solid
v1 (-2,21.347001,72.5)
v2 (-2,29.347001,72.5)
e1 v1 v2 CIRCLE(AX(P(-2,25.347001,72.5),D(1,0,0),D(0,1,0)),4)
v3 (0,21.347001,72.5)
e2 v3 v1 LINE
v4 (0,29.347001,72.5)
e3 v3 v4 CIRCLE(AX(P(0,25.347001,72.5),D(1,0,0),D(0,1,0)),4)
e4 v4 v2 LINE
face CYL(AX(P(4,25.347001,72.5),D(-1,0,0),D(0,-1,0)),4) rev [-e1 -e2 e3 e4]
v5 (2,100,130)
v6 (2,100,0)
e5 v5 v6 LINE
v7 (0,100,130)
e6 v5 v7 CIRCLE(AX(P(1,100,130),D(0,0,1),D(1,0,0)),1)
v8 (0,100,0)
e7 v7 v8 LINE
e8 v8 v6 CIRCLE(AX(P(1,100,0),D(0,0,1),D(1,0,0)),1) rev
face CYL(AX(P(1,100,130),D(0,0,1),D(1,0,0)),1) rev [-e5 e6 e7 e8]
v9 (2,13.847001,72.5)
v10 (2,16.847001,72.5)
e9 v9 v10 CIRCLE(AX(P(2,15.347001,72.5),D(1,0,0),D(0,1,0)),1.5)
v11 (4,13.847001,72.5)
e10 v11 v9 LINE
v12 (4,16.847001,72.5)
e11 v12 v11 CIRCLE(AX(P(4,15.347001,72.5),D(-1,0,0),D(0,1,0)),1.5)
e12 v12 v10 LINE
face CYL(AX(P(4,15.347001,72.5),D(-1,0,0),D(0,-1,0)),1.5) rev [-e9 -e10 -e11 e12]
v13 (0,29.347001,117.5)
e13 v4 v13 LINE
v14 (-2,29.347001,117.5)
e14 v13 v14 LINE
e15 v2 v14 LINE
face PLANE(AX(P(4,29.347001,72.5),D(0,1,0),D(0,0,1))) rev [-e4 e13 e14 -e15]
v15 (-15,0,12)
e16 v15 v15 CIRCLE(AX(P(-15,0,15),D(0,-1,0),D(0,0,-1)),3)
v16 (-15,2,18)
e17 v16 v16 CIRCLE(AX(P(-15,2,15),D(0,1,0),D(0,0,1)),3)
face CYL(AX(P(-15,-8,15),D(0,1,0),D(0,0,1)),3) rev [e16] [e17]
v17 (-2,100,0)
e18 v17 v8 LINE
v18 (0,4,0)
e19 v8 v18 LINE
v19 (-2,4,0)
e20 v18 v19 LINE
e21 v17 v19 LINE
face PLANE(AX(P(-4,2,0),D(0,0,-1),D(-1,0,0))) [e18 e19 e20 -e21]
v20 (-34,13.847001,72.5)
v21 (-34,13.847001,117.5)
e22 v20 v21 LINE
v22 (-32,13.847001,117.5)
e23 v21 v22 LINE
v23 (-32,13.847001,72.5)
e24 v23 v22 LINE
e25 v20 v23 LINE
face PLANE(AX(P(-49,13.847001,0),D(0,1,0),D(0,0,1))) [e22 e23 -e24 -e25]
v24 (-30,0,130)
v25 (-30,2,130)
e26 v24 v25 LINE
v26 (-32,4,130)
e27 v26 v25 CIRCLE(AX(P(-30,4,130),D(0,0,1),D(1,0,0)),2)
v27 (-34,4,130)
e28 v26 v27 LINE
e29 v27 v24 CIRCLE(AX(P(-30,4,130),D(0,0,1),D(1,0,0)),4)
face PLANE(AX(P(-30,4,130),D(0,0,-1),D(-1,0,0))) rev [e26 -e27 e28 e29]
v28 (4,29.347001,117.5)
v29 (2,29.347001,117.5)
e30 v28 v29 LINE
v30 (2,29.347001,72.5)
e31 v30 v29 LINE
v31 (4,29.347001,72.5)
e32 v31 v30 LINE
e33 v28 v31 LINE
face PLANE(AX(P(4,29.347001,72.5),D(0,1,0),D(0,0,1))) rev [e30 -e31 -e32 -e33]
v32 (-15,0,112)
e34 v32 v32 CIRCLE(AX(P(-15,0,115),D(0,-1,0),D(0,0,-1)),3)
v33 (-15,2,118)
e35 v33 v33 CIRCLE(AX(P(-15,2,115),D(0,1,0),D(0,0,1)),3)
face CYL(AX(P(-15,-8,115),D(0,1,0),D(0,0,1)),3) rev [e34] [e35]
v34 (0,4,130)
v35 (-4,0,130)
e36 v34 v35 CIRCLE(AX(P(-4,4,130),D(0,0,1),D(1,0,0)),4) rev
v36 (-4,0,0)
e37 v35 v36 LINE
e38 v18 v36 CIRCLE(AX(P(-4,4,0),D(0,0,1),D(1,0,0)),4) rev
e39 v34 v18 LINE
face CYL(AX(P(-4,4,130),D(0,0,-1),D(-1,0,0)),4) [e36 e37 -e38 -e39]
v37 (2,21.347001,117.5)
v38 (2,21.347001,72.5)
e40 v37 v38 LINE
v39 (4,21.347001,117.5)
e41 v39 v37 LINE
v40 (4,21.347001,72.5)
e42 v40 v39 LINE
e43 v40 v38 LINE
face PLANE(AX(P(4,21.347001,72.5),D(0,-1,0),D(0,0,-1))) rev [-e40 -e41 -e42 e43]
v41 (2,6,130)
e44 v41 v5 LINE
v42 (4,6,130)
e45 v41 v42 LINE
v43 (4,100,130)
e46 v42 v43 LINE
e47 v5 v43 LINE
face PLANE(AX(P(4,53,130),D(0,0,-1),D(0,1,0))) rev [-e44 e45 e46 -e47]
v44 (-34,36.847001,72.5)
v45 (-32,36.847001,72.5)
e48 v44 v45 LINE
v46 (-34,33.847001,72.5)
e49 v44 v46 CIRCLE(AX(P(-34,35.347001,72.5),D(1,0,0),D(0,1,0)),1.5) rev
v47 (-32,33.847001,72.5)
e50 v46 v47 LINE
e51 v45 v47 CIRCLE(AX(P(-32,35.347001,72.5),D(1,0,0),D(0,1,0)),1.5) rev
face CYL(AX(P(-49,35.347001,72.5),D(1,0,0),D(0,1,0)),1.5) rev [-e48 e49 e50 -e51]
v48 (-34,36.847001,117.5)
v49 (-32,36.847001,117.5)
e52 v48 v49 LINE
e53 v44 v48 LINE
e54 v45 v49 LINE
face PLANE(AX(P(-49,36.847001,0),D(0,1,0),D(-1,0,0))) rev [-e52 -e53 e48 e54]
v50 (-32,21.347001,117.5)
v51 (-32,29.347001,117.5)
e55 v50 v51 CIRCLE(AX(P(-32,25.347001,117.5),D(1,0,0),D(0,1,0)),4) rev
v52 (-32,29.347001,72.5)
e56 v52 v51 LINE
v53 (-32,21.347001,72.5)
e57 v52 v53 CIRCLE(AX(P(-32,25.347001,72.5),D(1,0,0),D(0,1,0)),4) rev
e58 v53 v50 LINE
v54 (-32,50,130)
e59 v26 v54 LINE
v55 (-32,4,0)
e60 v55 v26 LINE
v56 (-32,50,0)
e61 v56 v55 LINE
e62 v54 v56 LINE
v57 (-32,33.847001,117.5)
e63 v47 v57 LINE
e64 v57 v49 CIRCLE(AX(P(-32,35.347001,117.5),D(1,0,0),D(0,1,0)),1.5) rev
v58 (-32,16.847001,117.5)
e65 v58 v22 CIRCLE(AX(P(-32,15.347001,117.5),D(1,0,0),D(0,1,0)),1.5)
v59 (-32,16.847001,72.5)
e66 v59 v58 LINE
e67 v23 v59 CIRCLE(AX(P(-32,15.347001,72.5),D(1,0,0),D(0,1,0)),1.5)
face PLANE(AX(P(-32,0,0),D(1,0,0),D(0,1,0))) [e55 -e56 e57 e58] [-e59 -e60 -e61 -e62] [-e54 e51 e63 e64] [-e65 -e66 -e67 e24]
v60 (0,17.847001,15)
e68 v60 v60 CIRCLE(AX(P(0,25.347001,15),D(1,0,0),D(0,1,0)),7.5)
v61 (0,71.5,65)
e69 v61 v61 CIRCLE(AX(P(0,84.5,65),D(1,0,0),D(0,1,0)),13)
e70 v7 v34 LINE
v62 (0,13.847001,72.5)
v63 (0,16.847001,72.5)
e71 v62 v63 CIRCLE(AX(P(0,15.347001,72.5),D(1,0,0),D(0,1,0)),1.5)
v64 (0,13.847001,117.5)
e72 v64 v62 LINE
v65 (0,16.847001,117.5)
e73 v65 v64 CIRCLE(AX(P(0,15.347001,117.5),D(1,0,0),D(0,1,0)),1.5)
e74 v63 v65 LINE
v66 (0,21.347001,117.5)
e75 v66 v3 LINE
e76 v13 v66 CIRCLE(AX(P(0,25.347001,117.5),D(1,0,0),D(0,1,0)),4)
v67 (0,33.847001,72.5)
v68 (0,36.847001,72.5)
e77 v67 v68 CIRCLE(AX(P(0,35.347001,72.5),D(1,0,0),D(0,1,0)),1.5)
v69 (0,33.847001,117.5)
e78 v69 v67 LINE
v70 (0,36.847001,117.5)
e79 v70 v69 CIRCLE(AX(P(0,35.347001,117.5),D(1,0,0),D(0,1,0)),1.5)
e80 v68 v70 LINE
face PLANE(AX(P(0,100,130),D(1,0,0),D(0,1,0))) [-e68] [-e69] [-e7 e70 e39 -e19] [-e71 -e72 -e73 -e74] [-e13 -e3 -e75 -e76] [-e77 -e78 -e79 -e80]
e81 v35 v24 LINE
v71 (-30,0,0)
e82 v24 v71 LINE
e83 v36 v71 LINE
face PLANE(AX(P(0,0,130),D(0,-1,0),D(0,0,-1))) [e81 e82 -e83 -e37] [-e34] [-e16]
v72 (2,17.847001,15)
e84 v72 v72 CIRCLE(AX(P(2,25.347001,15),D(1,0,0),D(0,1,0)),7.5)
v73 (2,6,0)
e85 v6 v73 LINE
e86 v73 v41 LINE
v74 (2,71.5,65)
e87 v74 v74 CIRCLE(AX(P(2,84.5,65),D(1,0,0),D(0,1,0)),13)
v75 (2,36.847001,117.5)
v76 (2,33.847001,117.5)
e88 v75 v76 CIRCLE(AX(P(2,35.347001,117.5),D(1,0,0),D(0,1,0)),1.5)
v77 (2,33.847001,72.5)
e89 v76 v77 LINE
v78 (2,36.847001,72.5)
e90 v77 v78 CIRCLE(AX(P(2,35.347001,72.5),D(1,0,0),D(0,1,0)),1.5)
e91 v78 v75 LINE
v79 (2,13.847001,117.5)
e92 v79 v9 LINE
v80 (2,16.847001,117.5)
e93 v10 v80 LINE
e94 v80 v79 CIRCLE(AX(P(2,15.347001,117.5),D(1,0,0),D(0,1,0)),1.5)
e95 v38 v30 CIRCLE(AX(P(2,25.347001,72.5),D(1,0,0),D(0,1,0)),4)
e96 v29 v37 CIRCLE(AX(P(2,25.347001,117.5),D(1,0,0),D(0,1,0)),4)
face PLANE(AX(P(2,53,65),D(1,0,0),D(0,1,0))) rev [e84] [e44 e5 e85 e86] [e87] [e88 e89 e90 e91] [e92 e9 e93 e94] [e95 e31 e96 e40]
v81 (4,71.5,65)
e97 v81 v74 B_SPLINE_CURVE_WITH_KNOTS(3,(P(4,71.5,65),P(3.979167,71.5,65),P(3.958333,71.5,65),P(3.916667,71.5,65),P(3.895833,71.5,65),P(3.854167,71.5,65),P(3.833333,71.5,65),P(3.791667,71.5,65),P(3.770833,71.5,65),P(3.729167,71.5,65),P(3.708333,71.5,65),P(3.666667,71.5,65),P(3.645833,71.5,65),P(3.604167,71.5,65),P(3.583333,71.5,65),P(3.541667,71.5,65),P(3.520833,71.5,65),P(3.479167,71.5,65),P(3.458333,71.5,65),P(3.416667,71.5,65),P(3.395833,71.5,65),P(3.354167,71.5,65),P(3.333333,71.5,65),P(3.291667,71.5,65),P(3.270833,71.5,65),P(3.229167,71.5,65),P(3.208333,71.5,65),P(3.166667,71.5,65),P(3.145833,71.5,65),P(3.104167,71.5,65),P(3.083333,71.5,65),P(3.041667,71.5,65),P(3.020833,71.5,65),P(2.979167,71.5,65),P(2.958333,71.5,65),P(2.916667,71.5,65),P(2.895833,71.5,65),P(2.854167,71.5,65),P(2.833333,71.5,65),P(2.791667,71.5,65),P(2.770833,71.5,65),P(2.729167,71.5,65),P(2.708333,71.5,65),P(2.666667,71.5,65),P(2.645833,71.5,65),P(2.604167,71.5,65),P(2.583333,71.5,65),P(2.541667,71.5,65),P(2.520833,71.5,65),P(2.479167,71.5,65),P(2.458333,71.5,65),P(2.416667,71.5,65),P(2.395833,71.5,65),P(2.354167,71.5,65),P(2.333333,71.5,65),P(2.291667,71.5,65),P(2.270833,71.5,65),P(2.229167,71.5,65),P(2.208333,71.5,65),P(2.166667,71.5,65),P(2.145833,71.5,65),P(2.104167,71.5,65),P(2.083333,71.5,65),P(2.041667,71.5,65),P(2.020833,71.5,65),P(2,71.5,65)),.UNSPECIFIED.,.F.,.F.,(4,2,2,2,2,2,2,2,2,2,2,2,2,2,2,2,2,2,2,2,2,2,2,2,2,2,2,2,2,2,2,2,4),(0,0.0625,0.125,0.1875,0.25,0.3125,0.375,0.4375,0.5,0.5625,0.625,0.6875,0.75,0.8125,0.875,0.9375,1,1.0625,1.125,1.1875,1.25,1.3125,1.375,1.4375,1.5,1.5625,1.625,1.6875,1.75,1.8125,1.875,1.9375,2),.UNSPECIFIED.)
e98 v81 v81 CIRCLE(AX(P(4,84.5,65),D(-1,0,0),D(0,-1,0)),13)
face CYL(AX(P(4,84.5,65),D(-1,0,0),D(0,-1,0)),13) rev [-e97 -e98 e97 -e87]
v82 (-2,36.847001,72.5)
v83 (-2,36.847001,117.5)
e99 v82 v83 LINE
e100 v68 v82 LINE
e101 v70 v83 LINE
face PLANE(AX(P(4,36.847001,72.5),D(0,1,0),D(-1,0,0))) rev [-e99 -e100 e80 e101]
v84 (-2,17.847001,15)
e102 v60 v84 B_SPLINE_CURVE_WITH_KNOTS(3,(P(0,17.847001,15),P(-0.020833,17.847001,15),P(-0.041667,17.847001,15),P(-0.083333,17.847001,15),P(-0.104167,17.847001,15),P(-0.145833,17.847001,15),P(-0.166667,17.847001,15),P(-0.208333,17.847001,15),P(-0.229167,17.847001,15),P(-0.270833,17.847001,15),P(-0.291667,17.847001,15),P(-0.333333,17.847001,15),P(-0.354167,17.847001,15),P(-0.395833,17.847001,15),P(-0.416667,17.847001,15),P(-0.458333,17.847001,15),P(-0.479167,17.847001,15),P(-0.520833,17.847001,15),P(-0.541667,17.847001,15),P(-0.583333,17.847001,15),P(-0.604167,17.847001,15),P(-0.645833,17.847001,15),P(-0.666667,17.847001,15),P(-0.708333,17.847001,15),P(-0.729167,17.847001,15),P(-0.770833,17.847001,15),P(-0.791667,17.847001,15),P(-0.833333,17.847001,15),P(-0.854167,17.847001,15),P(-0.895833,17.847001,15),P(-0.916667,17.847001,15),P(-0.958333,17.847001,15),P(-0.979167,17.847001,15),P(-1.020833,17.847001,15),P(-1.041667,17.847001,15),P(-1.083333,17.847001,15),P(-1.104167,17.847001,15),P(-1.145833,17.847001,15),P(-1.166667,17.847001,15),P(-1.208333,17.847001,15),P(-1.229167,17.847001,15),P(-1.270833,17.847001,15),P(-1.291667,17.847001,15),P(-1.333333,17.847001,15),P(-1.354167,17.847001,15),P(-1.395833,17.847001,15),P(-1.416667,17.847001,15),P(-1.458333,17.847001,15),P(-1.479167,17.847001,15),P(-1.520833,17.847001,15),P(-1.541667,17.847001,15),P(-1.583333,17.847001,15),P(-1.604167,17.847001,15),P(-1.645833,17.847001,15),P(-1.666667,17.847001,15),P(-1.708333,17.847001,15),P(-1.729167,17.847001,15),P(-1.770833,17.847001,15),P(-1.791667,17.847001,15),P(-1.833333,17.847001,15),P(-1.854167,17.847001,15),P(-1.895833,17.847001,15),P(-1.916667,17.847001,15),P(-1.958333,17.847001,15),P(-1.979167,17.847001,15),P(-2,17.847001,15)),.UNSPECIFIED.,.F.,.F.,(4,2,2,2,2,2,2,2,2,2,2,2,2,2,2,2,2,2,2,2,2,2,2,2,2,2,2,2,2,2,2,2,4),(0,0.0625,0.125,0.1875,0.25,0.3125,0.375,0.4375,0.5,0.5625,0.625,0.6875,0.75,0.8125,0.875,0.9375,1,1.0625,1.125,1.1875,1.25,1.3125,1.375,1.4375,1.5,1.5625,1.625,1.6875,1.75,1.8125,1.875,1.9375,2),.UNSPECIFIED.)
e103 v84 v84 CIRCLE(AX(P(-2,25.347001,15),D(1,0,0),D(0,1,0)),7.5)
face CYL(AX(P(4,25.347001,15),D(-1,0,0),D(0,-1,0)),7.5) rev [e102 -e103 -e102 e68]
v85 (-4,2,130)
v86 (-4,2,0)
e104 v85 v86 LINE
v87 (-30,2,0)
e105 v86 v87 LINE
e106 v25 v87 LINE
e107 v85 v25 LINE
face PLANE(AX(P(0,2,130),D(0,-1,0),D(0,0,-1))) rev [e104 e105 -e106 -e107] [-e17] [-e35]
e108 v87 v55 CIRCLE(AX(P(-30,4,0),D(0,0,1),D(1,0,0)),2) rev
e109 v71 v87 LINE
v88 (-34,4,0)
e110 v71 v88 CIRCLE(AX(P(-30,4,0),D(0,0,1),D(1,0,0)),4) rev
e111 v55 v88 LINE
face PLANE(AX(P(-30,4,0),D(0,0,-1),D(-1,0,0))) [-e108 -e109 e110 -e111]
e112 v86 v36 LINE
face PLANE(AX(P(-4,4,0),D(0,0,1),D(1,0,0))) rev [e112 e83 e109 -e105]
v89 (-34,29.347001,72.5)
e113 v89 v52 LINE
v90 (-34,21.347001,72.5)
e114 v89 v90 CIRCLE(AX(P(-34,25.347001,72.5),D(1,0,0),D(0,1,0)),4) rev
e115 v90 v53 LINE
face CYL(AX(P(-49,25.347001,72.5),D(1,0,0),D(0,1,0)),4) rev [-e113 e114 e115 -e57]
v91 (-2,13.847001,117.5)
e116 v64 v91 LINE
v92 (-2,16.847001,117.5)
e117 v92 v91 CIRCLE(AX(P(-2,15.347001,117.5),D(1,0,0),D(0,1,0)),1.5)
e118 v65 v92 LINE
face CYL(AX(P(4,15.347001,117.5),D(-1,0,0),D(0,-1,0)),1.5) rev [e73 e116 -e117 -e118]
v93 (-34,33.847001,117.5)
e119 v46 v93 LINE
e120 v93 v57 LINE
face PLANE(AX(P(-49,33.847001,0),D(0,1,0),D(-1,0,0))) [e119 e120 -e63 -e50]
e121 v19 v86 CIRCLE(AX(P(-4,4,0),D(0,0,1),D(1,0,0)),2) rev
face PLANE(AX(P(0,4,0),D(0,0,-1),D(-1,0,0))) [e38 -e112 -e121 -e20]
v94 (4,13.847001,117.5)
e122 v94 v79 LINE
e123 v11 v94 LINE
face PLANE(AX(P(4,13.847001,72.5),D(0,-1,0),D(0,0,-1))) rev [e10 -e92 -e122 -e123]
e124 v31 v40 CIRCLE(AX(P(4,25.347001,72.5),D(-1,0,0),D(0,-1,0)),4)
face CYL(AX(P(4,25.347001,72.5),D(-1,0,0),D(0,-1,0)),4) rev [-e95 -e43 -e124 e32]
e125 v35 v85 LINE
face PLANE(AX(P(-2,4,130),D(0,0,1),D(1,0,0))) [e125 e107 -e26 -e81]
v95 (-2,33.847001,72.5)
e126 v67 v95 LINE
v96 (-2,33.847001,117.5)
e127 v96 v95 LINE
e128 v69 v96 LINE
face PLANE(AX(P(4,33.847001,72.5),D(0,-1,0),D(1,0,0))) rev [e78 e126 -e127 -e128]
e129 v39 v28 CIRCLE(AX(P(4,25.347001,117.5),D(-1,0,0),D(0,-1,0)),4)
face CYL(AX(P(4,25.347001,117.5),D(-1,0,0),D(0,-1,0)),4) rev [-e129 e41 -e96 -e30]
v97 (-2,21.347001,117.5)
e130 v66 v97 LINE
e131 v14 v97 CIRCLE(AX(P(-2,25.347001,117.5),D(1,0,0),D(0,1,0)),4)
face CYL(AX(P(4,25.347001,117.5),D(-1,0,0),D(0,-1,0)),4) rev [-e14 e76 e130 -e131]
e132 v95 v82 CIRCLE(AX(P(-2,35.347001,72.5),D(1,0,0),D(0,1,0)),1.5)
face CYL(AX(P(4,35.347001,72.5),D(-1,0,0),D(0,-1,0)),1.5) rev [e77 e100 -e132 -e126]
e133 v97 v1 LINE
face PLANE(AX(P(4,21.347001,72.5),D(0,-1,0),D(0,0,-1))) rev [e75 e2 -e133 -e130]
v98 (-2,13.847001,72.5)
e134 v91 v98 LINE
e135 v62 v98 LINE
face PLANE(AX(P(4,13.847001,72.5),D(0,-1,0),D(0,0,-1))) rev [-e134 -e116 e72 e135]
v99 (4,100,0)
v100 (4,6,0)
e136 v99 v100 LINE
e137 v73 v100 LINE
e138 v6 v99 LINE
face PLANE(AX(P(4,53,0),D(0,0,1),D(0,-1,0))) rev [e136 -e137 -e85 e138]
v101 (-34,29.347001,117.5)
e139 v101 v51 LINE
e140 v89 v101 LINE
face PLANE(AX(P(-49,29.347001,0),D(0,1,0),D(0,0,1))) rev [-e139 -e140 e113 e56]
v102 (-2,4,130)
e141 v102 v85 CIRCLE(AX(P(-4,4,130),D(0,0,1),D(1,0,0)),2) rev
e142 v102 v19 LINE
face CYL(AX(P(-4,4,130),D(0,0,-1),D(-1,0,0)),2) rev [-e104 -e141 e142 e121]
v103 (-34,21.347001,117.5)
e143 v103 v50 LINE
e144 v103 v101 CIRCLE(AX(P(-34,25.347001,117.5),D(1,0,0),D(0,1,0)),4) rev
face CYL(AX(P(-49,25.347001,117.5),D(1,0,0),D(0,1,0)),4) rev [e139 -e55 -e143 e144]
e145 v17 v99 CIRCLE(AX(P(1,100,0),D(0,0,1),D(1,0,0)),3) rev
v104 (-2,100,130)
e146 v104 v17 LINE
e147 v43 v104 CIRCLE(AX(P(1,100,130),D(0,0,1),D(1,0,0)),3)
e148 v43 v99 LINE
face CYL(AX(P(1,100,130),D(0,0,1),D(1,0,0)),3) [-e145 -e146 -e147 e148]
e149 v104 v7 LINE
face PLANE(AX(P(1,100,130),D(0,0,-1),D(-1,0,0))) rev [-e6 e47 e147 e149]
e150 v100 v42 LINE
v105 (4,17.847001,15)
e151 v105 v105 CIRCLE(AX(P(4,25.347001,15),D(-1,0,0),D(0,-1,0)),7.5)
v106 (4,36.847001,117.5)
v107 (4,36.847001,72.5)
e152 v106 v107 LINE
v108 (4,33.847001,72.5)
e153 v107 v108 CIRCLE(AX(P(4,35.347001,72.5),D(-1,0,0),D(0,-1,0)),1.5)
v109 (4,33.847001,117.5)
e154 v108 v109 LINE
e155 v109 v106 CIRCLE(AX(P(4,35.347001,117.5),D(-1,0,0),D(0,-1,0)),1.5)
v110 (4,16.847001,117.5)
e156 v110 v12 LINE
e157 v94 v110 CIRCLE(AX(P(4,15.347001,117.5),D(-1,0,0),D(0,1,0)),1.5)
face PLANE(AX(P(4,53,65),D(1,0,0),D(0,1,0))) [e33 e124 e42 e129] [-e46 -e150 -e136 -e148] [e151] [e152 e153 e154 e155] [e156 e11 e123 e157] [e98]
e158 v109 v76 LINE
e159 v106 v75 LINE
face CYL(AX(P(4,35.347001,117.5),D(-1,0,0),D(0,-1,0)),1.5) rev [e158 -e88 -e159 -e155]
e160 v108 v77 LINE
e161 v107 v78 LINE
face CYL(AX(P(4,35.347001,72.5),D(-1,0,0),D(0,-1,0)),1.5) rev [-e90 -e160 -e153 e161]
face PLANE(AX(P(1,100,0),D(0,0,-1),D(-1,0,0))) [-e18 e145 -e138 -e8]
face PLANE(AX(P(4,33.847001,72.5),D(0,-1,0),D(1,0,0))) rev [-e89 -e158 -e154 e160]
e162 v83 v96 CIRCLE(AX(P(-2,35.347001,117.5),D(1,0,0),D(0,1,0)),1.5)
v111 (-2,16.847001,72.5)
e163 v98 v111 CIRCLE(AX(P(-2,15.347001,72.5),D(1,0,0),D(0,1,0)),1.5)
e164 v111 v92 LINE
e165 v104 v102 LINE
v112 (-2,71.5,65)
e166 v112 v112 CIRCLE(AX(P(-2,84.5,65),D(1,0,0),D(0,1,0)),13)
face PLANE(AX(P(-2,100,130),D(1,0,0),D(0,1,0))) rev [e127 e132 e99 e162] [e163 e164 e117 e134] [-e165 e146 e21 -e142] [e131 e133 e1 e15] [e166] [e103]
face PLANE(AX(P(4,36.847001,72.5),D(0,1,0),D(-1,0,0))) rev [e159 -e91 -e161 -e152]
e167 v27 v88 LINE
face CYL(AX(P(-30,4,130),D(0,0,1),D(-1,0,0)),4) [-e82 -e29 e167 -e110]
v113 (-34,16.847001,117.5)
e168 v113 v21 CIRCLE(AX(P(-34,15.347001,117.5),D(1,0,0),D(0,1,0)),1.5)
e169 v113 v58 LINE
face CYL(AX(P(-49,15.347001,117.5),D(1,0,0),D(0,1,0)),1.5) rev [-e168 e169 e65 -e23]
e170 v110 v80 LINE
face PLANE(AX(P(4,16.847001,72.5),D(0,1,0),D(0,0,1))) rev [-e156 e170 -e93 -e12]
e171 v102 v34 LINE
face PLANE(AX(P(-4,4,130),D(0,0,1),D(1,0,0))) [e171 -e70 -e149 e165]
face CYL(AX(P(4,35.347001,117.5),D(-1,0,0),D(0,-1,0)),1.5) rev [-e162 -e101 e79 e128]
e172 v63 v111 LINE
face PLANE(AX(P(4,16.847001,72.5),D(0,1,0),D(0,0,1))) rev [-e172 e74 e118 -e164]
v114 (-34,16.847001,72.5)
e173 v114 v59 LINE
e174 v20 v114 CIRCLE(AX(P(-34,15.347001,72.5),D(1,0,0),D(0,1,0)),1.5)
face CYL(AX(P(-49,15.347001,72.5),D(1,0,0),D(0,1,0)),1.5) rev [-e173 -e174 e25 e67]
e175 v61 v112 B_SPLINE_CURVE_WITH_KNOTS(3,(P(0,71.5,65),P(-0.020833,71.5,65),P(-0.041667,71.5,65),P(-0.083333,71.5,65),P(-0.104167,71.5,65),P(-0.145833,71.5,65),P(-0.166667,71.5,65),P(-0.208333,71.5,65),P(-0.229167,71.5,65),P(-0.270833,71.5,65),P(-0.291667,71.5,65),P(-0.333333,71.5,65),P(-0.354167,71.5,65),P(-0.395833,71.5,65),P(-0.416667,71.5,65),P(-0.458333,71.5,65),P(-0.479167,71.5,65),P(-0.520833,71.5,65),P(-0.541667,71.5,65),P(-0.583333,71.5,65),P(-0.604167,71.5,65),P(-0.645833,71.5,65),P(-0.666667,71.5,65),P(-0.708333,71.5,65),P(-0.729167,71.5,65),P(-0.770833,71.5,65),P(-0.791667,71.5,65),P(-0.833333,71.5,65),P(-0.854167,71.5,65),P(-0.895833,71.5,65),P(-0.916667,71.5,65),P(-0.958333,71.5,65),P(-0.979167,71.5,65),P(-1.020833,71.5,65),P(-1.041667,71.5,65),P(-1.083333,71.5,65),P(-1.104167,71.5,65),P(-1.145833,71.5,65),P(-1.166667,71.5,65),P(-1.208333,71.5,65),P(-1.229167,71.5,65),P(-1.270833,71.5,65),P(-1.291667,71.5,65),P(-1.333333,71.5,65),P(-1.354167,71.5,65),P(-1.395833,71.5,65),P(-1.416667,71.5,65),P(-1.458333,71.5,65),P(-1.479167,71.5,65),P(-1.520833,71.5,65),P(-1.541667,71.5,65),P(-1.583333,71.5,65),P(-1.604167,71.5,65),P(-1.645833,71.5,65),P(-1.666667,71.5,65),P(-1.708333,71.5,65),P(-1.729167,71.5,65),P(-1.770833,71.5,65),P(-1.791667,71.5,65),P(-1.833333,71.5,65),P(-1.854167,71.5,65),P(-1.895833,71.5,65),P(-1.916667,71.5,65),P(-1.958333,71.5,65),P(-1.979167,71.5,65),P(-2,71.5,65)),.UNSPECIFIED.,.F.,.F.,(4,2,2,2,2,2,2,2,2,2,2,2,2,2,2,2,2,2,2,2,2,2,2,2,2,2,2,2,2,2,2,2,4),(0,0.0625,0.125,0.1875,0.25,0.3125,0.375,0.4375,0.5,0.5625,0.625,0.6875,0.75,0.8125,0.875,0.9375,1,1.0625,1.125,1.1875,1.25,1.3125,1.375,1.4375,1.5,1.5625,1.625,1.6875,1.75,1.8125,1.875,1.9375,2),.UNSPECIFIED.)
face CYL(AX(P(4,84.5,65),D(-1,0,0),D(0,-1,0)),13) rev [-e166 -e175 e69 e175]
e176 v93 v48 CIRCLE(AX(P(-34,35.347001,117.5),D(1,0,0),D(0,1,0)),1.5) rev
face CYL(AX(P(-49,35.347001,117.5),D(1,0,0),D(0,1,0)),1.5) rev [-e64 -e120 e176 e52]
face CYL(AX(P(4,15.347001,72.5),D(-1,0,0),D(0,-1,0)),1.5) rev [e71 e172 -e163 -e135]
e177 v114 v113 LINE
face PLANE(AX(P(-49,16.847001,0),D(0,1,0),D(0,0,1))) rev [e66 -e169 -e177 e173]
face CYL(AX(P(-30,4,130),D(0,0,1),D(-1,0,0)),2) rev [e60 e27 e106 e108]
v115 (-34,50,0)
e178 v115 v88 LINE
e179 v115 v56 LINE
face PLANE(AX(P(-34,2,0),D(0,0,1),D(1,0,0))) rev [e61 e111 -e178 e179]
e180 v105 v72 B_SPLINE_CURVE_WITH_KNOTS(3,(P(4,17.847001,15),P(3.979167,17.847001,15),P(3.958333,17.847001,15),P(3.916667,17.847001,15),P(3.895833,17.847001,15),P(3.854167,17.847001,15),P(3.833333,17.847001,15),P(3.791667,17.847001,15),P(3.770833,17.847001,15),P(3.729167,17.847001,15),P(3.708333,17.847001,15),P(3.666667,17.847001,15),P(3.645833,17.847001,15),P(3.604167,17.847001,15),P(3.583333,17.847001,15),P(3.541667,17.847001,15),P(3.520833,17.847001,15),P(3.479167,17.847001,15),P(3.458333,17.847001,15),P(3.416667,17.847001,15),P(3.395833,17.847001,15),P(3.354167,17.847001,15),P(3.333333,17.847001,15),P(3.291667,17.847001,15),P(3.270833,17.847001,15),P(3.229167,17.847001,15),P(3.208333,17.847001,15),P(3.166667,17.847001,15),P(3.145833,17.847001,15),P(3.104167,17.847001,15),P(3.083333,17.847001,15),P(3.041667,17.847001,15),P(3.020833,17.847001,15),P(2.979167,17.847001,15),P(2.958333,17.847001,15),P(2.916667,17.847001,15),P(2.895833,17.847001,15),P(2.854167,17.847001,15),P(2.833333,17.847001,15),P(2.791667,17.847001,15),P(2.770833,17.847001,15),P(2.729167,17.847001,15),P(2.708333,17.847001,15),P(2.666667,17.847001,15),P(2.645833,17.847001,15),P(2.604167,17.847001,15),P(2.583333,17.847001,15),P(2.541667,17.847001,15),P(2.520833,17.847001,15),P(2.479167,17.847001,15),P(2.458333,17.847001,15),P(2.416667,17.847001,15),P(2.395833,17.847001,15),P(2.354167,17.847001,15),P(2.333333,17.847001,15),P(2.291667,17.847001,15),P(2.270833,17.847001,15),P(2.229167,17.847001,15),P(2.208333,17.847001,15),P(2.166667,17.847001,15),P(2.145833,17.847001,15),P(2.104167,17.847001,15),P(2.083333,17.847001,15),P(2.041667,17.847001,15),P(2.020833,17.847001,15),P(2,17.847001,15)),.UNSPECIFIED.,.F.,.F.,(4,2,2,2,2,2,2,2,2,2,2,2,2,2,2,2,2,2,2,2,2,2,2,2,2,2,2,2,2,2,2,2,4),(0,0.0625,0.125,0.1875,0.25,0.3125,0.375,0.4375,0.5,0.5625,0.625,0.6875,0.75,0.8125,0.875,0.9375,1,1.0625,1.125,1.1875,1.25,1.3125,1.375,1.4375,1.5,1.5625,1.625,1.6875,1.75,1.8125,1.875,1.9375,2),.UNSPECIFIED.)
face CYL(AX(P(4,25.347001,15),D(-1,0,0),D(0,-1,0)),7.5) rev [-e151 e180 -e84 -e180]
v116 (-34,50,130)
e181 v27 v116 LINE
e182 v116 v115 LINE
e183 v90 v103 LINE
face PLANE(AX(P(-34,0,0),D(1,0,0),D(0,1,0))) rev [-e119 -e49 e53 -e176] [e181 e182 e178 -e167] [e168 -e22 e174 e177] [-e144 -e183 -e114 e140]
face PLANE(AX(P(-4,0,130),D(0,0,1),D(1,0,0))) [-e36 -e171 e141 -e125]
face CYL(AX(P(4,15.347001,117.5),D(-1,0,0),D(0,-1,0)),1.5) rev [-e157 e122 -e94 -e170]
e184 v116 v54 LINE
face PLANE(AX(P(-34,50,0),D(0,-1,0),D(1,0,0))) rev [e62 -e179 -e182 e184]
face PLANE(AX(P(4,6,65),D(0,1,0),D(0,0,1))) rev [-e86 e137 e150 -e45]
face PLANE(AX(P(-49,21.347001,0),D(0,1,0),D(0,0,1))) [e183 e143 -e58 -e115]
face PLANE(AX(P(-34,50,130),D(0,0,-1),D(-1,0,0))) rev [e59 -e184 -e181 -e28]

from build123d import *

# Parameters (mm, degrees)
BASE_FLANGE1_DEPTH      = 130
SKETCH6_R               = 3
CUT_EXTRUDE1_DEPTH      = 10
HEM1_DEPTH              = 130
CUT_EXTRUDE2_DEPTH      = 169.205231785
CUT_EXTRUDE2_DEPTH_BACK = 169.205231785
SKETCH7_R               = 13
SKETCH7_R_2             = 7.5
EDGE_FLANGE1_DEPTH      = 130
CUT_EXTRUDE3_DEPTH      = 47


# Read off the part's stored shape, not the designer's step: Hem1
# Sheet-metal steps are written as plain solids
with BuildPart() as part:
    # Sketch1 → Base-Flange1 (new body)
    with BuildSketch(Plane.XY):
        with BuildLine():
            Line((0, 100), (0, 4))
            ThreePointArc((0, 4), (-1.171572875, 1.171572875), (-4, 0))
            Line((-4, 0), (-30, 0))
            Line((-30, 0), (-30, 2))
            Line((-30, 2), (-4, 2))
            ThreePointArc((-4, 2), (-2.585786438, 2.585786438), (-2, 4))
            Line((-2, 4), (-2, 100))
            Line((-2, 100), (0, 100))
        make_face()
    extrude(amount=BASE_FLANGE1_DEPTH)

    # Sketch6 → Cut-Extrude1 (cut)
    with BuildSketch(Plane(origin=(0, 2, 0), x_dir=(1, 0, 0), z_dir=(0, 1, 0))):
        with Locations(Location((-15, -15, 0), (0, 0, 270))):
            Circle(SKETCH6_R)
        with Locations(Location((-15, -115, 0), (0, 0, 270))):
            Circle(SKETCH6_R)
    extrude(amount=-CUT_EXTRUDE1_DEPTH, mode=Mode.SUBTRACT)

    # Hem1 outline → Hem1 (add)
    with BuildSketch(Plane.XY):
        with BuildLine():
            Line((2, 6), (4, 6))
            Line((4, 6), (4, 100))
            ThreePointArc((4, 100), (1, 103), (-2, 100))
            Line((-2, 100), (0, 100))
            ThreePointArc((0, 100), (1, 101), (2, 100))
            Line((2, 100), (2, 6))
        make_face()
    extrude(amount=HEM1_DEPTH)

    # Sketch7 → Cut-Extrude2 (cut, two sides: drawn at the far end of the back side and taken through both)
    with BuildSketch(Plane.ZY.offset(2).offset(-CUT_EXTRUDE2_DEPTH_BACK)):
        with Locations(Location((65, 84.5, 0), (0, 0, 270))):
            Circle(SKETCH7_R)
        with Locations(Location((15, 25.347000811, 0), (0, 0, 270))):
            Circle(SKETCH7_R_2)
        with BuildLine():
            Line((72.5, 29.347000811), (117.5, 29.347000811))
            ThreePointArc((117.5, 29.347000811), (121.5, 25.347000811), (117.5, 21.347000811))
            Line((117.5, 21.347000811), (72.5, 21.347000811))
            ThreePointArc((72.5, 21.347000811), (68.5, 25.347000811), (72.5, 29.347000811))
        make_face()
        with BuildLine():
            Line((72.5, 36.847000811), (117.5, 36.847000811))
            ThreePointArc((117.5, 36.847000811), (119, 35.347000811), (117.5, 33.847000811))
            Line((117.5, 33.847000811), (72.5, 33.847000811))
            ThreePointArc((72.5, 33.847000811), (71, 35.347000811), (72.5, 36.847000811))
        make_face()
        with BuildLine():
            Line((72.5, 13.847000811), (117.5, 13.847000811))
            ThreePointArc((117.5, 13.847000811), (119, 15.347000811), (117.5, 16.847000811))
            Line((117.5, 16.847000811), (72.5, 16.847000811))
            ThreePointArc((72.5, 16.847000811), (71, 15.347000811), (72.5, 13.847000811))
        make_face()
    extrude(amount=CUT_EXTRUDE2_DEPTH + CUT_EXTRUDE2_DEPTH_BACK, mode=Mode.SUBTRACT)

    # Edge-Flange1 section (across the edge) → Edge-Flange1 (add)
    with BuildSketch(Plane(origin=(-32, 2, 0), x_dir=(1, 0, 0), z_dir=(0, 0, 1))):
        with BuildLine():
            Line((-2, 2), (-2, 48))
            Line((-2, 48), (0, 48))
            Line((0, 48), (0, 2))
            ThreePointArc((0, 2), (0.585786438, 0.585786438), (2, 0))
            Line((2, 0), (2, -2))
            ThreePointArc((2, -2), (-0.828427125, -0.828427125), (-2, 2))
        make_face()
    extrude(amount=EDGE_FLANGE1_DEPTH)

    # Sketch7<2> → Cut-Extrude3 (cut)
    with BuildSketch(Plane.ZY.offset(2)):
        with BuildLine():
            Line((72.5, 33.847000811), (117.5, 33.847000811))
            ThreePointArc((117.5, 33.847000811), (119, 35.347000811), (117.5, 36.847000811))
            Line((117.5, 36.847000811), (72.5, 36.847000811))
            ThreePointArc((72.5, 36.847000811), (71, 35.347000811), (72.5, 33.847000811))
        make_face()
        with BuildLine():
            Line((72.5, 21.347000811), (117.5, 21.347000811))
            ThreePointArc((117.5, 21.347000811), (121.5, 25.347000811), (117.5, 29.347000811))
            Line((117.5, 29.347000811), (72.5, 29.347000811))
            ThreePointArc((72.5, 29.347000811), (68.5, 25.347000811), (72.5, 21.347000811))
        make_face()
        with BuildLine():
            ThreePointArc((117.5, 16.847000811), (119, 15.347000811), (117.5, 13.847000811))
            Line((117.5, 13.847000811), (72.5, 13.847000811))
            ThreePointArc((72.5, 13.847000811), (71, 15.347000811), (72.5, 16.847000811))
            Line((72.5, 16.847000811), (117.5, 16.847000811))
        make_face()
    extrude(amount=CUT_EXTRUDE3_DEPTH, mode=Mode.SUBTRACT)


solid = part.part
